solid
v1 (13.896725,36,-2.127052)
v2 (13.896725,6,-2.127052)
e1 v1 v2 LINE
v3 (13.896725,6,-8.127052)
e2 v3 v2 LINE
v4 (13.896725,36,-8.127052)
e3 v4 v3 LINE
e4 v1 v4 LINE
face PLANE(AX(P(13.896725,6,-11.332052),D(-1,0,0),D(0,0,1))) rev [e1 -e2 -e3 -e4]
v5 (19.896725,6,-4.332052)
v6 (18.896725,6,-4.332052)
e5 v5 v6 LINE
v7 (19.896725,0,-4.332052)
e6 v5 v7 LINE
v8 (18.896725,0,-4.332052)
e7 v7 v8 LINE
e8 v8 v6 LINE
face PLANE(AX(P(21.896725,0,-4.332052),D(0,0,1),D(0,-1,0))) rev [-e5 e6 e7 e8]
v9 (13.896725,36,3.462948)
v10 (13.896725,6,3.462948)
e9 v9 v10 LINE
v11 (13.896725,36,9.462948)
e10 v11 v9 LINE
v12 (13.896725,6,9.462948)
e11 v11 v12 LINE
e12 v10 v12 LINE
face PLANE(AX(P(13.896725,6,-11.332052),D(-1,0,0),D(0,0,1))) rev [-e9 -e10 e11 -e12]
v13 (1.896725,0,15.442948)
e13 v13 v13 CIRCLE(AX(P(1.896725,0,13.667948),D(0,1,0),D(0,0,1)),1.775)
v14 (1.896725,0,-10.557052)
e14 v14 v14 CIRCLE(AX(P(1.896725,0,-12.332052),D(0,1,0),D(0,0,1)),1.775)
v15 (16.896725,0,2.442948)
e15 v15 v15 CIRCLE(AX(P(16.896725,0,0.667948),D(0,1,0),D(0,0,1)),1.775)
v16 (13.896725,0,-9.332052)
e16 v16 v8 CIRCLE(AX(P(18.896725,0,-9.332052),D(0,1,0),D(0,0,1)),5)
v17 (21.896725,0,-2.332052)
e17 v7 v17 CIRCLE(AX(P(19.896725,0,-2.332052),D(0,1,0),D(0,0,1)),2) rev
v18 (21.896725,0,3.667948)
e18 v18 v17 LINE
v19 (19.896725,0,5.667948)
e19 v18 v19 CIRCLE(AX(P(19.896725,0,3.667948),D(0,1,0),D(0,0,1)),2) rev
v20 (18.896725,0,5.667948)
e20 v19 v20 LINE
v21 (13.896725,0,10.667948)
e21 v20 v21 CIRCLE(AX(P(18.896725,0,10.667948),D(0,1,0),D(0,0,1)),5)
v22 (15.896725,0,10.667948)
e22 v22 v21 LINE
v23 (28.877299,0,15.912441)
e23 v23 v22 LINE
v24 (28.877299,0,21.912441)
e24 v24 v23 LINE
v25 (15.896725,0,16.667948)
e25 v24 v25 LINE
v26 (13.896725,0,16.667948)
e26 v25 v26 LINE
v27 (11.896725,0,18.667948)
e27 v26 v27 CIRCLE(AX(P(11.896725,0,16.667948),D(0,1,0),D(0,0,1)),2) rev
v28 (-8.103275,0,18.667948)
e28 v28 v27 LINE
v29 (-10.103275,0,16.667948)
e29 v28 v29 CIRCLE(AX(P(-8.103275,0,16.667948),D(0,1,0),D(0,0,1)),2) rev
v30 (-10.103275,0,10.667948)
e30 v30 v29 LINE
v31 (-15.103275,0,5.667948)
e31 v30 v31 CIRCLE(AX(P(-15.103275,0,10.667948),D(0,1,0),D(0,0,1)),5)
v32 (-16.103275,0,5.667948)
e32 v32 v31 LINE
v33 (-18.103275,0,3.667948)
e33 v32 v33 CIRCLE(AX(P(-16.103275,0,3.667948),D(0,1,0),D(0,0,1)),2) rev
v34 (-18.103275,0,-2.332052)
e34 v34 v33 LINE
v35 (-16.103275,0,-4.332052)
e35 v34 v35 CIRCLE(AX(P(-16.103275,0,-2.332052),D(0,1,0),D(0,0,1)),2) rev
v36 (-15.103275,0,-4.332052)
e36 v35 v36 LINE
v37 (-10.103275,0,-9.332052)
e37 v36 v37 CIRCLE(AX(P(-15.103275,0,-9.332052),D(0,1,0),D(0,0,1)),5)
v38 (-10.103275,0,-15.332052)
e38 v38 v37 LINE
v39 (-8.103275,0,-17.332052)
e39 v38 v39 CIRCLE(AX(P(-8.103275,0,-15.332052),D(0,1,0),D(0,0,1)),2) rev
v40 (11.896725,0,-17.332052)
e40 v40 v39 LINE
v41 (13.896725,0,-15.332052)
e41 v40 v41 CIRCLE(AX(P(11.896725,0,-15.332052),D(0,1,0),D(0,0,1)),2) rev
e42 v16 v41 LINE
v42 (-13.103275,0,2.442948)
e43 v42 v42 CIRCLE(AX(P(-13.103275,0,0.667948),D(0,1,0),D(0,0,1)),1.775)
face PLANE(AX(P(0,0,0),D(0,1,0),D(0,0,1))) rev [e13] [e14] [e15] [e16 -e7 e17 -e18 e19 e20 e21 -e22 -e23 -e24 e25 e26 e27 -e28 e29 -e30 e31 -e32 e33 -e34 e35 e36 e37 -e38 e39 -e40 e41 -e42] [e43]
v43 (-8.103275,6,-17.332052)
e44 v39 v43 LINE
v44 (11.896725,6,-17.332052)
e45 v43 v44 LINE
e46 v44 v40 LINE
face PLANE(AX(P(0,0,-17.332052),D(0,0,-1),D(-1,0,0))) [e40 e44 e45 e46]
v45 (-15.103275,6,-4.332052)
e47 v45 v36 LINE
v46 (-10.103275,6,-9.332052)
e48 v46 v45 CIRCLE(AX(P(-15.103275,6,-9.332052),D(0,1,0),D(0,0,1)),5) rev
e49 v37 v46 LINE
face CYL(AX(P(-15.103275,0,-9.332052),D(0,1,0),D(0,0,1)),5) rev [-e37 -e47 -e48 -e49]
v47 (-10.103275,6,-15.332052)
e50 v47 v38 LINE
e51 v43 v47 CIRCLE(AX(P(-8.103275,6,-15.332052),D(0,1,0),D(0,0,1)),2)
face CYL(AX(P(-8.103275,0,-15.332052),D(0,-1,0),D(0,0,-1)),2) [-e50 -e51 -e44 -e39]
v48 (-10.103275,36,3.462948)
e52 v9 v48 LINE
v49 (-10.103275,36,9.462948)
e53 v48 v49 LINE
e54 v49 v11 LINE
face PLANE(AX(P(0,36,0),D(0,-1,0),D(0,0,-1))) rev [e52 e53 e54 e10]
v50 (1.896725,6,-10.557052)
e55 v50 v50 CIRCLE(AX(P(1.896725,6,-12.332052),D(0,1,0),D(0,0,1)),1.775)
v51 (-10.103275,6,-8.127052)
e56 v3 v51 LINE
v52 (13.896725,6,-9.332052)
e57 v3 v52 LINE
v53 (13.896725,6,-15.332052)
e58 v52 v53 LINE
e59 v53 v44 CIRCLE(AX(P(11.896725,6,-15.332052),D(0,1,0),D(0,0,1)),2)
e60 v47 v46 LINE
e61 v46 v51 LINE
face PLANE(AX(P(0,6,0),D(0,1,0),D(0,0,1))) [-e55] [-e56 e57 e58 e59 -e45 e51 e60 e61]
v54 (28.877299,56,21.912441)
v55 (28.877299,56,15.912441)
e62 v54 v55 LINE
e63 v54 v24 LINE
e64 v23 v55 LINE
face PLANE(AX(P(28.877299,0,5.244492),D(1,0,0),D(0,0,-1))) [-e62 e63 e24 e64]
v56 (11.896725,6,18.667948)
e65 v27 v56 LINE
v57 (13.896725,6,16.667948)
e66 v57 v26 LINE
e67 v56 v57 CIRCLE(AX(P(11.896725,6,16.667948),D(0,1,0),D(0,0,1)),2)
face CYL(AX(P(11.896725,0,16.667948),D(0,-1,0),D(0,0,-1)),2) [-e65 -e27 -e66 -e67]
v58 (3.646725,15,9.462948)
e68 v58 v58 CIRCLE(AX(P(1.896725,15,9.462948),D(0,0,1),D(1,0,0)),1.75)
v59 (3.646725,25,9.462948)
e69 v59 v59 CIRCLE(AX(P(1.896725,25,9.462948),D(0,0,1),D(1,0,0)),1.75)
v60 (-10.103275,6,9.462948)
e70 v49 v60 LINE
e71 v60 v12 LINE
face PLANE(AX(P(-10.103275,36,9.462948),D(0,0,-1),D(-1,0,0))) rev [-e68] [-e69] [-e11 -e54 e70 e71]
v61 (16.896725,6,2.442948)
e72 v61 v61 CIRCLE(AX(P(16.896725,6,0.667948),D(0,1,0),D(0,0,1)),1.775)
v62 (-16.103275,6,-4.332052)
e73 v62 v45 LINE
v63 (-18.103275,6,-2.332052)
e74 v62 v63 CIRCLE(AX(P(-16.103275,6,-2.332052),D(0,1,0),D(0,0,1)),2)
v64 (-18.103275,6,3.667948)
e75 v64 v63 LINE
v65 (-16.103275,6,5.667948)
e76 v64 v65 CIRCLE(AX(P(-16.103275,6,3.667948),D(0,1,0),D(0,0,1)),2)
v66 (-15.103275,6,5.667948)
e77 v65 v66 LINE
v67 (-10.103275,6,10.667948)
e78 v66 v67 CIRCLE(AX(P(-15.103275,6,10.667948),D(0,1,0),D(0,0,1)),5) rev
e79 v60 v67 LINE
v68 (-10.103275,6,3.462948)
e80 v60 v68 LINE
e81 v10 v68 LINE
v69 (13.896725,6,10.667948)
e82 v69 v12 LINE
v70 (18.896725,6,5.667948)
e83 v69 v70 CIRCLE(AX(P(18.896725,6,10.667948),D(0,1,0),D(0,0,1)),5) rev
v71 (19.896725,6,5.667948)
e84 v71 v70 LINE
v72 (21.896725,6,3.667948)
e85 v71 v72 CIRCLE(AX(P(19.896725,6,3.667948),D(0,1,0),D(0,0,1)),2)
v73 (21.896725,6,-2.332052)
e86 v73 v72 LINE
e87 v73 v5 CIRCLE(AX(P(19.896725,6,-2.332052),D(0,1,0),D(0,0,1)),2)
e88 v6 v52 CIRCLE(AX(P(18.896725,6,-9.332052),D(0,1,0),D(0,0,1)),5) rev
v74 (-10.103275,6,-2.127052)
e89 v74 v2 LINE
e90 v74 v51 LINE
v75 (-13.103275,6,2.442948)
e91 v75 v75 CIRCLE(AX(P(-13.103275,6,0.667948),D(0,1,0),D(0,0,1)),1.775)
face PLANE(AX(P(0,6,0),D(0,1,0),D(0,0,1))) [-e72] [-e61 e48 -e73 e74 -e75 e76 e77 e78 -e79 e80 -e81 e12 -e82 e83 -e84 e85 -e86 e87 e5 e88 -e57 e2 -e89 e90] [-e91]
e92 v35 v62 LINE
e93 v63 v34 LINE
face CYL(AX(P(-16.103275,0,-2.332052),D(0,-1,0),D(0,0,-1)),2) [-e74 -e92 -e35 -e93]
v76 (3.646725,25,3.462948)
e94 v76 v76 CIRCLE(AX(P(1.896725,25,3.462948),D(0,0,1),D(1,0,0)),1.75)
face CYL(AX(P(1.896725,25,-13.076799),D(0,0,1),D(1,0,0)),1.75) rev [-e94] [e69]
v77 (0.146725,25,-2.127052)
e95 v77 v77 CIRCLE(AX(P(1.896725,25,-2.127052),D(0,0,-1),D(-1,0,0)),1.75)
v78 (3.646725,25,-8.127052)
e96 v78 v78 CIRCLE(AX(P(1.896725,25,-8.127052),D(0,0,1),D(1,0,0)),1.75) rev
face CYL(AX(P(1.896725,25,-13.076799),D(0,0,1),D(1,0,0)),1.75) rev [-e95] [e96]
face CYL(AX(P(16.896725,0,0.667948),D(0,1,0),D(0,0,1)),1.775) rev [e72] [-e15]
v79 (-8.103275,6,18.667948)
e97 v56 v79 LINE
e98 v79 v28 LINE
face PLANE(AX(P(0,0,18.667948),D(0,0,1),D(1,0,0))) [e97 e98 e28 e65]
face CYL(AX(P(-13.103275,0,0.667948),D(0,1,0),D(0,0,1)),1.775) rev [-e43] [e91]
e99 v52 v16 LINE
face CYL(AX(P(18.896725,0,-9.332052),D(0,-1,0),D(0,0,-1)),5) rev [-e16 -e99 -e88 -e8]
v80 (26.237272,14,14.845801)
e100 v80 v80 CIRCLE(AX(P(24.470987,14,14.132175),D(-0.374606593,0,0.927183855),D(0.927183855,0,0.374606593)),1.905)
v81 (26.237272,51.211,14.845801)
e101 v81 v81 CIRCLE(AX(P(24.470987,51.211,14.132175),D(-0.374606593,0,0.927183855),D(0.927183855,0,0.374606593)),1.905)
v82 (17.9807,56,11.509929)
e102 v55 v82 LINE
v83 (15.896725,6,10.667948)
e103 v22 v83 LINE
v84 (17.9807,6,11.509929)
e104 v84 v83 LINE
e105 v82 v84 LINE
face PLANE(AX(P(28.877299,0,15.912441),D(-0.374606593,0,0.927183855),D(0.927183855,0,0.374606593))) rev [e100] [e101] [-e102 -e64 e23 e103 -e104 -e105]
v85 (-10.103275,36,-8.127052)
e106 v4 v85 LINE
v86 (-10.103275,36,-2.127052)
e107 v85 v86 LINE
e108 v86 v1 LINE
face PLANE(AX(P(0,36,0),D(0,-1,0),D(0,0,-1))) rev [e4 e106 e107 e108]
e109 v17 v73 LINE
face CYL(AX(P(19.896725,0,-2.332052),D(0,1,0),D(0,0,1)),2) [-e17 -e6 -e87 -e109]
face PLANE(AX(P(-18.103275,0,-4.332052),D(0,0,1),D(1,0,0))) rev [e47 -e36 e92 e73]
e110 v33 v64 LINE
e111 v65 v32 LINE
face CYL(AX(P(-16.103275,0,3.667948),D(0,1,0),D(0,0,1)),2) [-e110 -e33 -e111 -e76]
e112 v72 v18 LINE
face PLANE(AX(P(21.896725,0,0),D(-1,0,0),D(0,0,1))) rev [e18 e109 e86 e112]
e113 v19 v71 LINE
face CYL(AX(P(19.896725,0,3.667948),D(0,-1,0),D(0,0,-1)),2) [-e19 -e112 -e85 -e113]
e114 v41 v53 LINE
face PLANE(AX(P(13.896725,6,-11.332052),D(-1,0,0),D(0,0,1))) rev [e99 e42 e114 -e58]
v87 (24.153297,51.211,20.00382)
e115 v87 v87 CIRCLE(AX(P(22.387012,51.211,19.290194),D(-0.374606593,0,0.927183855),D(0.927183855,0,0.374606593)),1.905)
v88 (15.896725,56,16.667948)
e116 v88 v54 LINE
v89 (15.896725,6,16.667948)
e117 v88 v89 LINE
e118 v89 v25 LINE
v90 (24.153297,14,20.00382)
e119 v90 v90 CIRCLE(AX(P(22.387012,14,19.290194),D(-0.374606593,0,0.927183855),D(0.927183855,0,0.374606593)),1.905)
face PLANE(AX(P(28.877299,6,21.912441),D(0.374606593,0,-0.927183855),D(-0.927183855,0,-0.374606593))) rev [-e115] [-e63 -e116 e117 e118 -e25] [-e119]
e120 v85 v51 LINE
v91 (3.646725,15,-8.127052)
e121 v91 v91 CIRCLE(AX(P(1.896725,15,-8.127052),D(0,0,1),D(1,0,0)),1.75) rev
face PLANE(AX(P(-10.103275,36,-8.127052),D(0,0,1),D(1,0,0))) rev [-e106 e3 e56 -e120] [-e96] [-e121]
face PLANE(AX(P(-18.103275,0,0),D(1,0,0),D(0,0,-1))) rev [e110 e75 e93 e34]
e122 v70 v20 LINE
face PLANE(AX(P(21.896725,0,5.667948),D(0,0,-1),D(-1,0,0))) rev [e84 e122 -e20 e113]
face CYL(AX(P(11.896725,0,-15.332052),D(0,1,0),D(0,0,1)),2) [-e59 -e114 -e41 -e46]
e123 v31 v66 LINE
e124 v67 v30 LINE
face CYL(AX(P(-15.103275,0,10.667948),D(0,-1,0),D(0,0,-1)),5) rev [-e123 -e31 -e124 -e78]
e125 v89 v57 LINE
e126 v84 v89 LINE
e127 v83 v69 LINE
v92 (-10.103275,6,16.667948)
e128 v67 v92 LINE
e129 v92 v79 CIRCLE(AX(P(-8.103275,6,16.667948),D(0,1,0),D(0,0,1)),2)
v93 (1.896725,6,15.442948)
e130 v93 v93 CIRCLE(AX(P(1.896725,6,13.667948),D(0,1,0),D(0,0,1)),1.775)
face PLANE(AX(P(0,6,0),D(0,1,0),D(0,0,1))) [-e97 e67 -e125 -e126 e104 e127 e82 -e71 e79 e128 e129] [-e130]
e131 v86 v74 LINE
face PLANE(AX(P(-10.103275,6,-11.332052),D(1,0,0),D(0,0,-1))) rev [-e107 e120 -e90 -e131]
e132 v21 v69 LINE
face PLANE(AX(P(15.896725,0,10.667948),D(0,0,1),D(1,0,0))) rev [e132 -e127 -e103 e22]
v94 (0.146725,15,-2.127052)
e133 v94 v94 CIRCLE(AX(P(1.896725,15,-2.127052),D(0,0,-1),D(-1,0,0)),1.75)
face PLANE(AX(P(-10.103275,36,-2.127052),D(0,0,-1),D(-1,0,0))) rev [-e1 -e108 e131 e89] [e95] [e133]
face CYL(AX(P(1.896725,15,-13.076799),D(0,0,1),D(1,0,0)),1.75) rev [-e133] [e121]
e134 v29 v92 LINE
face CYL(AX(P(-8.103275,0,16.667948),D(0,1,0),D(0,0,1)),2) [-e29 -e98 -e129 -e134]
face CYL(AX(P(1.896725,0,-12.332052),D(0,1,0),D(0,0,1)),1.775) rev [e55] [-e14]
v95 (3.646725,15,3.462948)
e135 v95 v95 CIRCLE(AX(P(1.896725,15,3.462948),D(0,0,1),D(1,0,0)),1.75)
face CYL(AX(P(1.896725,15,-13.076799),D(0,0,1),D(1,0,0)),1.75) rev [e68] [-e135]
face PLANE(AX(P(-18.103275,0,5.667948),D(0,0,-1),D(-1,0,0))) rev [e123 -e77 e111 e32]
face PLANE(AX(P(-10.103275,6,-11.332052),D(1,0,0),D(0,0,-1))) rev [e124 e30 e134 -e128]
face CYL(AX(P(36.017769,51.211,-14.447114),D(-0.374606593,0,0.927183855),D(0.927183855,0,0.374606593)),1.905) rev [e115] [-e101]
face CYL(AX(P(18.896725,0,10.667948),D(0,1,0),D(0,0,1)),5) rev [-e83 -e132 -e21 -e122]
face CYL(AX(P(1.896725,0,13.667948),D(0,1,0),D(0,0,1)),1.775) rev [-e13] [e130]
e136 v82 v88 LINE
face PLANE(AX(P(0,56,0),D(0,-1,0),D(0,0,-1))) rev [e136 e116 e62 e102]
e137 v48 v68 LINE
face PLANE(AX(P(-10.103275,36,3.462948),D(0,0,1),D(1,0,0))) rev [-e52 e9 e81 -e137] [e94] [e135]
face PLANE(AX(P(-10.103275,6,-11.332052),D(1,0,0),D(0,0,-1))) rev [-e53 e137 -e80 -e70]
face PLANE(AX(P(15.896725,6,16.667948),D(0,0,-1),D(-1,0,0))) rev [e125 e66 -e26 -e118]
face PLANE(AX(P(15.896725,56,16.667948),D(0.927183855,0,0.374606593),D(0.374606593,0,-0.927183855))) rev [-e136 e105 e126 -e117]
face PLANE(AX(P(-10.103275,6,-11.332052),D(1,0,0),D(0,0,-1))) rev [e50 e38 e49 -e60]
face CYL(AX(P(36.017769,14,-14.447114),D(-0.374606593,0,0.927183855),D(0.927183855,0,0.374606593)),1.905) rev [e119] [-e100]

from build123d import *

# Parameters (mm, degrees)
SKETCH1_W           = 24
SKETCH1_H           = 24
BOSS_EXTRUDE1_DEPTH = 6
SKETCH2_W           = 24
SKETCH2_H           = 6
BOSS_EXTRUDE2_DEPTH = 30
SKETCH3_W           = 24
SKETCH3_H           = 6
BOSS_EXTRUDE3_DEPTH = 6
SKETCH4_W           = 24
SKETCH4_H           = 6
BOSS_EXTRUDE4_DEPTH = 6
SKETCH5_W           = 10
SKETCH5_H           = 6
BOSS_EXTRUDE5_DEPTH = 8
FILLET1_R           = 5
FILLET2_R           = 2
FILLET3_R           = 2
SKETCH6_W           = 10
SKETCH6_H           = 6
BOSS_EXTRUDE6_DEPTH = 8
FILLET4_R           = 5
FILLET5_R           = 2
SKETCH7_R           = 1.775
CUT_EXTRUDE1_DEPTH  = 42.568724431
SKETCH8_W           = 6
SKETCH8_H           = 6
BOSS_EXTRUDE7_DEPTH = 2
SKETCH10_W          = 6
SKETCH10_H          = 6
BOSS_EXTRUDE8_DEPTH = 14
BOSS_EXTRUDE9_DEPTH = 50
SKETCH12_R          = 1.905
CUT_EXTRUDE2_DEPTH  = 70.795111418
CUT_EXTRUDE3_REACH  = 70.468
SKETCH13_R          = 1.75


with BuildPart() as part:
    # Sketch1 → Boss-Extrude1 (new body)
    with BuildSketch(Plane(origin=(0, 0, 0), x_dir=(1, 0, 0), z_dir=(0, 1, 0))):
        with Locations((1.896724894, -0.667948192)):
            Rectangle(SKETCH1_W, SKETCH1_H)
    extrude(amount=BOSS_EXTRUDE1_DEPTH)

    # Sketch2 → Boss-Extrude2 (add)
    with BuildSketch(Plane(origin=(0, 6, 0), x_dir=(1, 0, 0), z_dir=(0, 1, 0))):
        with Locations((1.896724894, -6.462948192)):
            Rectangle(SKETCH2_W, SKETCH2_H)
        with Locations((1.896724894, 5.127051808)):
            Rectangle(SKETCH2_W, SKETCH2_H)
    extrude(amount=BOSS_EXTRUDE2_DEPTH)

    # Sketch3 → Boss-Extrude3 (add)
    with BuildSketch(Plane.XY.offset(12.667948192)):
        with Locations((1.896724894, 3)):
            Rectangle(SKETCH3_W, SKETCH3_H)
    extrude(amount=BOSS_EXTRUDE3_DEPTH)

    # Sketch4 → Boss-Extrude4 (add)
    with BuildSketch(Plane(origin=(0, 0, -11.332051808), x_dir=(-1, 0, 0), z_dir=(0, 0, -1))):
        with Locations((-1.896724894, 3)):
            Rectangle(SKETCH4_W, SKETCH4_H)
    extrude(amount=BOSS_EXTRUDE4_DEPTH)

    # Sketch5 → Boss-Extrude5 (add)
    with BuildSketch(Plane(origin=(13.896724894, 0, 0), x_dir=(0, 0, -1), z_dir=(1, 0, 0))):
        with Locations((-0.667948192, 3)):
            Rectangle(SKETCH5_W, SKETCH5_H)
    extrude(amount=BOSS_EXTRUDE5_DEPTH)

    # Fillet1
    # the kernel refuses this fillet: 5 mm, written as the material it adds along each edge
    with BuildSketch(Plane(origin=(13.896724894, 0, -4.332051808), x_dir=(0, 0, -1), z_dir=(0, 1, 0)), Plane(origin=(13.896724894, 6, 5.667948192), x_dir=(0, 0, 1), z_dir=(0, -1, 0))) as fillet1_piece_1:
        with BuildLine():
            CenterArc((FILLET1_R, -FILLET1_R), FILLET1_R, 90, 90)
            Line((0, -FILLET1_R), (0, 0))
            Line((0, 0), (FILLET1_R, 0))
        make_face()
    extrude(amount=6)

    # Fillet2
    fillet2_edges = [part.edges().sort_by_distance(p)[0] for p in [
        (21.896724894, 3, -4.332051808),
        (21.896724894, 3, 5.667948192),
    ]]
    fillet(fillet2_edges, radius=FILLET2_R)

    # Fillet3
    fillet3_edges = [part.edges().sort_by_distance(p)[0] for p in [
        (-10.103275106, 3, 18.667948192),
        (13.896724894, 3, 18.667948192),
        (13.896724894, 3, -17.332051808),
        (-10.103275106, 3, -17.332051808),
    ]]
    fillet(fillet3_edges, radius=FILLET3_R)

    # Sketch6 → Boss-Extrude6 (add)
    with BuildSketch(Plane.ZY.offset(10.103275106)):
        with Locations((0.667948192, 3)):
            Rectangle(SKETCH6_W, SKETCH6_H)
    extrude(amount=BOSS_EXTRUDE6_DEPTH)

    # Fillet4
    # the kernel refuses this fillet: 5 mm, written as the material it adds along each edge
    with BuildSketch(Plane(origin=(-10.103275106, 6, -4.332051808), x_dir=(0, 0, -1), z_dir=(0, -1, 0)), Plane(origin=(-10.103275106, 0, 5.667948192), x_dir=(0, 0, 1), z_dir=(0, 1, 0))) as fillet4_piece_1:
        with BuildLine():
            CenterArc((FILLET4_R, -FILLET4_R), FILLET4_R, 90, 90)
            Line((0, -FILLET4_R), (0, 0))
            Line((0, 0), (FILLET4_R, 0))
        make_face()
    extrude(amount=6)

    # Fillet5
    fillet5_edges = [part.edges().sort_by_distance(p)[0] for p in [
        (-18.103275106, 3, -4.332051808),
        (-18.103275106, 3, 5.667948192),
    ]]
    fillet(fillet5_edges, radius=FILLET5_R)

    # Sketch7 → Cut-Extrude1 (cut, through all)
    with BuildSketch(Plane(origin=(0, 6, 0), x_dir=(1, 0, 0), z_dir=(0, 1, 0))):
        with Locations(Location((1.896724894, -13.667948192, 0), (0, 0, 270))):
            Circle(SKETCH7_R)
        with Locations(Location((-13.103275106, -0.667948192, 0), (0, 0, 270))):
            Circle(SKETCH7_R)
        with Locations(Location((1.896724894, 12.332051808, 0), (0, 0, 270))):
            Circle(SKETCH7_R)
        with Locations(Location((16.896724894, -0.667948192, 0), (0, 0, 270))):
            Circle(SKETCH7_R)
    extrude(amount=-CUT_EXTRUDE1_DEPTH, mode=Mode.SUBTRACT)

    # Sketch8 → Boss-Extrude7 (add)
    with BuildSketch(Plane(origin=(13.896724894, 0, 0), x_dir=(0, 0, -1), z_dir=(1, 0, 0))):
        with Locations((-13.667948192, 3)):
            Rectangle(SKETCH8_W, SKETCH8_H)
    extrude(amount=BOSS_EXTRUDE7_DEPTH)

    # Sketch10 → Boss-Extrude8 (add, along a direction that is not the sketch's normal)
    with BuildSketch(Plane(origin=(15.896724894, 0, 0), x_dir=(0, 0, -1), z_dir=(1, 0, 0))):
        with Locations((-13.667948192, 3)):
            Rectangle(SKETCH10_W, SKETCH10_H)
    extrude(amount=BOSS_EXTRUDE8_DEPTH, dir=(0.9271838545667885, 0, 0.3746065934159094))

    # Sketch11 → Boss-Extrude9 (add)
    with BuildSketch(Plane(origin=(0, 6, 0), x_dir=(1, 0, 0), z_dir=(0, 1, 0))):
        Polygon((28.877298858, -21.9124405), (15.896724894, -16.667948192), (17.980700006, -11.509928791), (28.877298858, -15.9124405), align=None)
    extrude(amount=BOSS_EXTRUDE9_DEPTH)

    # Sketch12 → Cut-Extrude2 (cut, through all)
    with BuildSketch(Plane(origin=(-3.558475874, 0, 8.807536853), x_dir=(0.9271838545667885, 0, 0.3746065934159093), z_dir=(-0.37460659341590935, 0, 0.9271838545667886))):
        with Locations((27.983109954, 14)):
            Circle(SKETCH12_R)
        with Locations((27.983109954, 51.211)):
            Circle(SKETCH12_R)
    extrude(amount=-CUT_EXTRUDE2_DEPTH, mode=Mode.SUBTRACT)

    # Cut-Extrude3: up to this face of the body (flat: up to its plane)
    cut_extrude3_end = Plane(part.part.faces().sort_by_distance((1.896724894, 21, -8.127051808))[0])
    # Sketch13 → Cut-Extrude3 (cut, up to the picked face)
    with BuildSketch(Plane.XY.offset(9.462948192), mode=Mode.PRIVATE) as cut_extrude3_sk1:
        with Locations((1.896724894, 15)):
            Circle(SKETCH13_R)
    cut_extrude3_tool1 = split(extrude(cut_extrude3_sk1.sketch, amount=-CUT_EXTRUDE3_REACH, mode=Mode.PRIVATE), bisect_by=cut_extrude3_end, keep=Keep.BOTH, mode=Mode.PRIVATE)
    # Sketch13 → Cut-Extrude3 (cut, up to the picked face)
    with BuildSketch(Plane.XY.offset(9.462948192), mode=Mode.PRIVATE) as cut_extrude3_sk2:
        with Locations((1.896724894, 25)):
            Circle(SKETCH13_R)
    cut_extrude3_tool2 = split(extrude(cut_extrude3_sk2.sketch, amount=-CUT_EXTRUDE3_REACH, mode=Mode.PRIVATE), bisect_by=cut_extrude3_end, keep=Keep.BOTH, mode=Mode.PRIVATE)
    add(cut_extrude3_tool1.solids().sort_by(Axis((1.896725, 15, 9.462948), (0, 0, -1)))[0], mode=Mode.SUBTRACT)
    add(cut_extrude3_tool2.solids().sort_by(Axis((1.896725, 25, 9.462948), (0, 0, -1)))[0], mode=Mode.SUBTRACT)


solid = part.part
